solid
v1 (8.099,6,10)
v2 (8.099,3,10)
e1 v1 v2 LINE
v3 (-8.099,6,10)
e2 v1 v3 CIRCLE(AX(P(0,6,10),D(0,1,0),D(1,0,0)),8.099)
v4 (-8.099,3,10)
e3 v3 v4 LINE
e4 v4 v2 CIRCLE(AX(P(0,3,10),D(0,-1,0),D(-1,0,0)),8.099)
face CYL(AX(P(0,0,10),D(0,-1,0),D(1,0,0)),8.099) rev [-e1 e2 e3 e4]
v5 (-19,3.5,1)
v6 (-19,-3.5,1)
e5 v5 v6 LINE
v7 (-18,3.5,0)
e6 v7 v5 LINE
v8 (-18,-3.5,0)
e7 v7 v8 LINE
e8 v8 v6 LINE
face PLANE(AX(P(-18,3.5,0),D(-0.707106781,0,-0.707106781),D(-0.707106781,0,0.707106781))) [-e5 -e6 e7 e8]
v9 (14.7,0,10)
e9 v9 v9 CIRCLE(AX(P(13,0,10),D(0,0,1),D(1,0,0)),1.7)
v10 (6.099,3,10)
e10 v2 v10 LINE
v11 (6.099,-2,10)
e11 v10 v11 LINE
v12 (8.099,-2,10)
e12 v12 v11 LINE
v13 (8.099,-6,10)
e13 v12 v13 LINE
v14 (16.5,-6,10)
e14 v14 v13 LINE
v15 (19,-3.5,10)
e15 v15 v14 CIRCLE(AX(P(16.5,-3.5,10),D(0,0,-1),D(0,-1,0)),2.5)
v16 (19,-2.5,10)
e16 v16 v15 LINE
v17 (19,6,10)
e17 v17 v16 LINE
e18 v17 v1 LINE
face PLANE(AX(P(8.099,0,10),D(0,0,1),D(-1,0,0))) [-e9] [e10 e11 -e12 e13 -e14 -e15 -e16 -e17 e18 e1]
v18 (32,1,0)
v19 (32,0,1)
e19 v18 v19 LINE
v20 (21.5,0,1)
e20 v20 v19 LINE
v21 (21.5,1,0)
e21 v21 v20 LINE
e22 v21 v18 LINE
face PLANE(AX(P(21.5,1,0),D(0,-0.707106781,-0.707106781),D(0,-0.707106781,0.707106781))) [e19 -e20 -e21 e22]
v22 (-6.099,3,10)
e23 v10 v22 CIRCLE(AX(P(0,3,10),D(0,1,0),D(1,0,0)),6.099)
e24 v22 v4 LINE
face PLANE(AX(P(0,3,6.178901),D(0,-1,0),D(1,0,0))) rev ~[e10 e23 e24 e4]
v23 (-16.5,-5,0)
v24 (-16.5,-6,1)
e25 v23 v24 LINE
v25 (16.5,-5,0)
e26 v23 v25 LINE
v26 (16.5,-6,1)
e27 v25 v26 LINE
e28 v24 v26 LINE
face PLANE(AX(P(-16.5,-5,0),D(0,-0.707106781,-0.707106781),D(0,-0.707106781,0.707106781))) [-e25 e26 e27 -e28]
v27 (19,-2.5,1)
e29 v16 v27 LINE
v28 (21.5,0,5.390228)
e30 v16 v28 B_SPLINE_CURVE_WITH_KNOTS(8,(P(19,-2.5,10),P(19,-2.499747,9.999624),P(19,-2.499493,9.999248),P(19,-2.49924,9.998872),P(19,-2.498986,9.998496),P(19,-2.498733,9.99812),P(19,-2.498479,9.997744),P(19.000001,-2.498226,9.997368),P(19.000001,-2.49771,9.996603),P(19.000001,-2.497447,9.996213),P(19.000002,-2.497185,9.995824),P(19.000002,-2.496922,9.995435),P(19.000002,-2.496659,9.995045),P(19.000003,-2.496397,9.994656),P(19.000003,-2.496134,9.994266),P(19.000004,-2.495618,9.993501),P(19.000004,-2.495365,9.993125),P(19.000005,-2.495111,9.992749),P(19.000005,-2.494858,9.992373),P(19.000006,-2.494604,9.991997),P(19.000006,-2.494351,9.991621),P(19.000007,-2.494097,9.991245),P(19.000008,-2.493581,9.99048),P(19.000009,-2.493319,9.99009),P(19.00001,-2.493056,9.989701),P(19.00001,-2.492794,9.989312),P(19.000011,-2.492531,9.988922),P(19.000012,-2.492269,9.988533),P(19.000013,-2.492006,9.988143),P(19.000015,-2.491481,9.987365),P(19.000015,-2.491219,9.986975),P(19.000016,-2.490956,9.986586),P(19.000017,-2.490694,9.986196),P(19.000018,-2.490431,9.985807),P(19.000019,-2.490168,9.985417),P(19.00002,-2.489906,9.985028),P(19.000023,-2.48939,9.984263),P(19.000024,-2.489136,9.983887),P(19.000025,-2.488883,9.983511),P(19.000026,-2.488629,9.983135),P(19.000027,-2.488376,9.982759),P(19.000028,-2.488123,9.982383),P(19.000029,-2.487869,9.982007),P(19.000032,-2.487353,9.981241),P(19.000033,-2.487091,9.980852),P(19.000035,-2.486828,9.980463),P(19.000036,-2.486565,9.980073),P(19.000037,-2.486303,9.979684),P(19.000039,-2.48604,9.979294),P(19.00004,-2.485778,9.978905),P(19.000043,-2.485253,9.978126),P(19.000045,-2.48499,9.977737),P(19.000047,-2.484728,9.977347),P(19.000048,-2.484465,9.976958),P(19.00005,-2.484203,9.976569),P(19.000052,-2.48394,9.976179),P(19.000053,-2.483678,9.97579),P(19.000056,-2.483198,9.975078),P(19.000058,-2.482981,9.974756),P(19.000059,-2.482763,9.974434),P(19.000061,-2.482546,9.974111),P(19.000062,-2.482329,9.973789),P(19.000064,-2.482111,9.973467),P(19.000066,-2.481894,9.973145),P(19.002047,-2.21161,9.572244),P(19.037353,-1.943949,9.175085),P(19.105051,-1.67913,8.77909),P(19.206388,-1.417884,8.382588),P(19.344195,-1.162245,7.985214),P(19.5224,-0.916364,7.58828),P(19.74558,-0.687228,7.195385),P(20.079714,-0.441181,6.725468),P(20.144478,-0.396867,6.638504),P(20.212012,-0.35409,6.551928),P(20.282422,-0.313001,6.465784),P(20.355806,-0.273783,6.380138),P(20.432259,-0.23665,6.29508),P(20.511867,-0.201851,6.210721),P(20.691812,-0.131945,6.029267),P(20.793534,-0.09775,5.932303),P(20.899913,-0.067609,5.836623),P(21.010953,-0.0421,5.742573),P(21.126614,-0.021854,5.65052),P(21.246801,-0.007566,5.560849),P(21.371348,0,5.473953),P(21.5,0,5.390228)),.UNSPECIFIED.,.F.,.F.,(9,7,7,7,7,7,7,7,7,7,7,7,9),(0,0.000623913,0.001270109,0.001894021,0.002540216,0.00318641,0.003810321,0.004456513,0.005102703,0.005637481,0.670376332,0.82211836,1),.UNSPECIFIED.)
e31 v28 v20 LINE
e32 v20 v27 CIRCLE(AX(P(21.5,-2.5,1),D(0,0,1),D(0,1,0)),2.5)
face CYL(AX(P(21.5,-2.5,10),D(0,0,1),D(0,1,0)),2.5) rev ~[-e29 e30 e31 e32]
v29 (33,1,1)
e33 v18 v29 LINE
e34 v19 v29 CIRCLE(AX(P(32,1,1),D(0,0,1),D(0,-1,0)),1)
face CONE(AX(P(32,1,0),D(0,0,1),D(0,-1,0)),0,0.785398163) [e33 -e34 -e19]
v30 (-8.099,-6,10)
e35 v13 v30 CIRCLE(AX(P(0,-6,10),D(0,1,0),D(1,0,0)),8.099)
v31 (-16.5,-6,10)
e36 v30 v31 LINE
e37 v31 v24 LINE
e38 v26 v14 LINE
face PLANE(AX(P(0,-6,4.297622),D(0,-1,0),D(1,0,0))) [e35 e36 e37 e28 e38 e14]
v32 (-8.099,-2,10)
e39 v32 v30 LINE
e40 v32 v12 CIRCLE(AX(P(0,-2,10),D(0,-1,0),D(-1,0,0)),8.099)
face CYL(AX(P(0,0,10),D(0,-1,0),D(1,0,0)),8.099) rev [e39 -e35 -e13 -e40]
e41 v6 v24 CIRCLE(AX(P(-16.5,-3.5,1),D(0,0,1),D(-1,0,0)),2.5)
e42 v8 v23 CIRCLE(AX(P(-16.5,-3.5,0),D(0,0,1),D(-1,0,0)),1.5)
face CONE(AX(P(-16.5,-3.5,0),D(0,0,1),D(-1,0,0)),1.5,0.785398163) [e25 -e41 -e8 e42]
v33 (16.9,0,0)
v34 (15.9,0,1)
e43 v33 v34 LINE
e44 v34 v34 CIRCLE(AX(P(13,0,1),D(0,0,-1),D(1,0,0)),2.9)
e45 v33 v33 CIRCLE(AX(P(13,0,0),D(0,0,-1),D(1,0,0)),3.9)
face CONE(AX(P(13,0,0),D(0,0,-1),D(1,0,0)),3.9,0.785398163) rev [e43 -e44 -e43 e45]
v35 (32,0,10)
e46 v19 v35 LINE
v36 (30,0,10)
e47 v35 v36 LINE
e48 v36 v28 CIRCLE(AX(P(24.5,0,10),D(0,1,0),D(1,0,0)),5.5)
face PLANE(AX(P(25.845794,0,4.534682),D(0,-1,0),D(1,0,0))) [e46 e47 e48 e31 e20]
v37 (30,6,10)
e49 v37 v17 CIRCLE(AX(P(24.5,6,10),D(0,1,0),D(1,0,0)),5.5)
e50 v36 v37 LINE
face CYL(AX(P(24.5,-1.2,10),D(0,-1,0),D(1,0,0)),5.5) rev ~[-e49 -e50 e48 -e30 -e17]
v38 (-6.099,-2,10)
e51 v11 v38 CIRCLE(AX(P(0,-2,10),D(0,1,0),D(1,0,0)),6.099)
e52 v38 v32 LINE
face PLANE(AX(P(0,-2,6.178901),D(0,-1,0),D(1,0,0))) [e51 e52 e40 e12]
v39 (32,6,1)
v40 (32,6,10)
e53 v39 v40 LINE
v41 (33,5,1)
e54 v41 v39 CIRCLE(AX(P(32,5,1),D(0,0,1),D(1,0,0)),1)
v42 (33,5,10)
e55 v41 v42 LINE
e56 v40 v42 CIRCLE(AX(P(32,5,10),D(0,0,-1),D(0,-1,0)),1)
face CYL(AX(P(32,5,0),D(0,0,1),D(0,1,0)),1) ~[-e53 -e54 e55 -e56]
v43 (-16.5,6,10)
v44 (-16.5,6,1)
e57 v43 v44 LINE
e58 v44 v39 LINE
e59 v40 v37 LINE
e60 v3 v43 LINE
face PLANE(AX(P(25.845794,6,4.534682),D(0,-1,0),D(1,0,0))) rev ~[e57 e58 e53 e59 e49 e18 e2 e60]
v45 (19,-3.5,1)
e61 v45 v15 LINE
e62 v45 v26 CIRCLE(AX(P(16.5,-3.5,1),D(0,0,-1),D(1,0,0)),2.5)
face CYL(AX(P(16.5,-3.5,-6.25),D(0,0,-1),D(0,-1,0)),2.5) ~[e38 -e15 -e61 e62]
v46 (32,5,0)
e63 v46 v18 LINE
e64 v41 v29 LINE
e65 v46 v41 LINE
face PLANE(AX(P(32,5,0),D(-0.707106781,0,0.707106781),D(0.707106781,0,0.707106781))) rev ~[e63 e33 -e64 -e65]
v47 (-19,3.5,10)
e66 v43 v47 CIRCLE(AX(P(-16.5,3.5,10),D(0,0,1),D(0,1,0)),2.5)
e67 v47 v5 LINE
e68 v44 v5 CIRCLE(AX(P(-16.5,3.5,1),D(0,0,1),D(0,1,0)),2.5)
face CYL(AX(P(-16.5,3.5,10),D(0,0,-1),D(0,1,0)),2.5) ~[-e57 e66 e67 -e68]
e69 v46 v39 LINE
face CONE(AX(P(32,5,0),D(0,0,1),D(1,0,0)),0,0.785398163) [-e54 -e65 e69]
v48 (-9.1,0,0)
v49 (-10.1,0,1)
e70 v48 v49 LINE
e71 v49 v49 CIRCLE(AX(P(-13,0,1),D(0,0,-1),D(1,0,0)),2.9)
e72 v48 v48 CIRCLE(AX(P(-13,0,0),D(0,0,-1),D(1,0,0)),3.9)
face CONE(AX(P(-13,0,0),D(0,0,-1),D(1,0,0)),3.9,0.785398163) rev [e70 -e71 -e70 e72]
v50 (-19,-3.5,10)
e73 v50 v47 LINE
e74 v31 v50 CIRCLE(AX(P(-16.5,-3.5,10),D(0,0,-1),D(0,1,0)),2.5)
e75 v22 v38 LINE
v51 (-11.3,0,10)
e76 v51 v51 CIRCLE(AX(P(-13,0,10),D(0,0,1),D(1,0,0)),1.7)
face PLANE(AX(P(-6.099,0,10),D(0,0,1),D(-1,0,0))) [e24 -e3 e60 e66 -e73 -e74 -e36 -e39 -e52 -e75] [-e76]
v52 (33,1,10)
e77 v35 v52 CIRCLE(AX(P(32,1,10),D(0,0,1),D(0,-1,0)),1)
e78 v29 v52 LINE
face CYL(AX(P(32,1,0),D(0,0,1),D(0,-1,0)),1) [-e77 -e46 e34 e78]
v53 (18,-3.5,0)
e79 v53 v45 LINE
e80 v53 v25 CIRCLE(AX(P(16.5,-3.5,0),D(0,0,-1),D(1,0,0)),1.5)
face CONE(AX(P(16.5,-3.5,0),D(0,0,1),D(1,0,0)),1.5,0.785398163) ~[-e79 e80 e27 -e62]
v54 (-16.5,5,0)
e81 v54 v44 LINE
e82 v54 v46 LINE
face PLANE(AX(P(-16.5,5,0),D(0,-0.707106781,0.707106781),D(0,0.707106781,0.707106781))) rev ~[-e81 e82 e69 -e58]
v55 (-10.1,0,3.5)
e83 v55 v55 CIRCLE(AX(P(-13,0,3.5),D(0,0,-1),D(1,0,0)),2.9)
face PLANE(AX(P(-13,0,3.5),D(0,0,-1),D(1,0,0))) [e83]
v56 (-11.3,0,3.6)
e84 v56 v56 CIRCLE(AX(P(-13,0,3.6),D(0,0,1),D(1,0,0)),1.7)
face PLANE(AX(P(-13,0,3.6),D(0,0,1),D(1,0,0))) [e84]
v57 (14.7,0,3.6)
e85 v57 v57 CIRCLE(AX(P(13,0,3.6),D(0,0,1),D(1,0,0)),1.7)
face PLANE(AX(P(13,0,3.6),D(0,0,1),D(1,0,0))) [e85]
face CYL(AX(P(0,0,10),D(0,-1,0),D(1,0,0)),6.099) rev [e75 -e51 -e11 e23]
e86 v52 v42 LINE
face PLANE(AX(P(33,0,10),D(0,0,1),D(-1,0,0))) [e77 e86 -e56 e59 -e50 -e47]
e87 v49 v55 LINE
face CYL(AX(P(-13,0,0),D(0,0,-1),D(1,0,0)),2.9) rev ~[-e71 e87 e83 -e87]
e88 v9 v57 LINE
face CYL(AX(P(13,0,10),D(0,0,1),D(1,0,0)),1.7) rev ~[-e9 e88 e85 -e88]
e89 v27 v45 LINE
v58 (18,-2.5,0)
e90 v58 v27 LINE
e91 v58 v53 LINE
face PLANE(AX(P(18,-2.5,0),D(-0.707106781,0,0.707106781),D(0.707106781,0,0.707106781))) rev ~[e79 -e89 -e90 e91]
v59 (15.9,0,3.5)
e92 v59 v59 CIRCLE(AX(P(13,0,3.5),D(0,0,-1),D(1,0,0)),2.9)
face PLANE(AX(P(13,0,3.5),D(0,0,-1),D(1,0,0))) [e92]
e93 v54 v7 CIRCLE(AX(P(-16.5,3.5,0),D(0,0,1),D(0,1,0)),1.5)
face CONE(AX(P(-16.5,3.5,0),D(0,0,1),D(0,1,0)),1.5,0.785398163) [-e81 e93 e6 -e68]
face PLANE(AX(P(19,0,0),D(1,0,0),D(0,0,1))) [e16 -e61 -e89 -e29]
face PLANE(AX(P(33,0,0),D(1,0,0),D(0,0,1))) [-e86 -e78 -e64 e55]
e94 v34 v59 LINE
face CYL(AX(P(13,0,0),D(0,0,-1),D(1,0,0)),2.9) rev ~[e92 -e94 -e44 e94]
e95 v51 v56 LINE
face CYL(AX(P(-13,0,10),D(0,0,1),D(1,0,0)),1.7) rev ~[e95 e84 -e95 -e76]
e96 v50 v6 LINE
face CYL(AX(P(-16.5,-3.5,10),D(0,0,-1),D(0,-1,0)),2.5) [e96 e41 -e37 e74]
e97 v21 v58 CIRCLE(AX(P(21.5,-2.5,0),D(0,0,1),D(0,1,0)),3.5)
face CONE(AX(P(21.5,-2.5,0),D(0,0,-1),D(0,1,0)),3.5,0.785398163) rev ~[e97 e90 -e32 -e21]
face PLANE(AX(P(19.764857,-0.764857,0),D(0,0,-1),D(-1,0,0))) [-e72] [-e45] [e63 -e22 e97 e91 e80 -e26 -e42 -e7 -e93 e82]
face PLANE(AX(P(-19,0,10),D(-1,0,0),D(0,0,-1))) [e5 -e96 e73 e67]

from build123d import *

# Parameters (mm, degrees)
F1_DEPTH      = 6
F2_DEPTH      = 2
F2_DEPTH_BACK = 3
F3_DEPTH      = 6
F4_R          = 2.9
F4_R_2        = 1.7
F5_DEPTH      = 3.5
F6_R          = 2.5
F7_T4_DEPTH   = 10
F7_S5_R       = 5.5
F7_T6_DEPTH   = 7
F7_T7_DEPTH   = 22.5
F8_R          = 1
F9_T1_DEPTH   = 48.4999999995
F9_T3_DEPTH   = 10.5
F9_T5_DEPTH   = 4
F9_T7_DEPTH   = 1
F9_T9_DEPTH   = 32.9999999994
F9_T11_DEPTH  = 7
F9_T18_ANGLE  = 90
F9_T20_ANGLE  = 89.9999999974
F9_T22_ANGLE  = 90
F9_T24_ANGLE  = 90.0000000053
F9_T26_ANGLE  = 90
F9_T28_ANGLE  = 90
F10_R         = 1.7
F11_DEPTH     = 6.4


# Not quite as in the source:
# - a fillet or chamfer that OpenCascade refuses, or shapes differently, is made with other operations: its cross-section is extruded or revolved along the edge and cut away or added


with BuildPart() as f1:
    # F0 (on Front) → F1 (new body, symmetric)
    with BuildSketch(Plane.XZ):
        with BuildLine():
            Line((18.9999999997, 0), (18.9999999997, 10))
            Line((18.9999999997, 10), (8.099, 10))
            ThreePointArc((8.099, 10), (0, 1.901), (-8.099, 10))
            Line((-8.099, 10), (-18.9999999997, 10))
            Line((-18.9999999997, 10), (-18.9999999997, 0))
            Line((-18.9999999997, 0), (18.9999999997, 0))
        make_face()
    extrude(amount=F1_DEPTH, both=True)

    # F0 (on Front) → F2 (join, two sides)
    with BuildSketch(Plane.XZ) as f2_sk:
        with BuildLine():
            ThreePointArc((-8.099, 10), (0, 1.901), (8.099, 10))
            Line((8.099, 10), (6.099, 10))
            ThreePointArc((6.099, 10), (0, 3.901), (-6.099, 10))
            Line((-6.099, 10), (-8.099, 10))
        make_face()
    extrude(amount=F2_DEPTH)
    extrude(f2_sk.sketch, amount=-F2_DEPTH_BACK)

    # F0 (on Front) → F3 (join)
    with BuildSketch(Plane.XZ):
        with BuildLine():
            ThreePointArc((29.9999999997, 10), (24.4999999997, 4.5), (18.9999999997, 10))
            Line((18.9999999997, 10), (18.9999999997, 0))
            Line((18.9999999997, 0), (32.9999999997, 0))
            Line((32.9999999997, 0), (32.9999999997, 10))
            Line((32.9999999997, 10), (29.9999999997, 10))
        make_face()
    extrude(amount=-F3_DEPTH)

    # F4 (on face) → F5 (cut)
    with BuildSketch(Plane(origin=(0, 0, 0), x_dir=(1, 0, 0), z_dir=(0, 0, -1))):
        with Locations((13, 0)):
            Circle(F4_R)
        with Locations((13, 0)):
            Circle(F4_R_2, mode=Mode.SUBTRACT)
        with Locations((-13, 0)):
            Circle(F4_R)
        with Locations((-13, 0)):
            Circle(F4_R_2, mode=Mode.SUBTRACT)
        with Locations((13, 0)):
            Circle(F4_R_2)
        with Locations((-13, 0)):
            Circle(F4_R_2)
    extrude(amount=-F5_DEPTH, mode=Mode.SUBTRACT)

    # F6
    f6_edges = [f1.edges().sort_by_distance(p)[0] for p in [
        (-19, 6, 5),
        (-19, -6, 5),
    ]]
    fillet(f6_edges, radius=F6_R)

    # F7: fillet of radius 2.5 on 2 edges, made by hand


with BuildPart() as f7_tool2:
    # F7_s3 → F7_t4 (new body)
    with BuildSketch(Plane.XY.offset(10)):
        with BuildLine():
            ThreePointArc((21.4999999997, 0), (19.7322330468, -0.732233047), (18.9999999997, -2.5))
            Line((18.9999999997, -2.5), (18.9999999997, 0))
            Line((18.9999999997, 0), (21.4999999997, 0))
        make_face()
    extrude(amount=-F7_T4_DEPTH)

    # F7_s5 → F7_t6 (cut, symmetric)
    with BuildSketch(Plane.XZ.offset(1.2)):
        with Locations((24.4999999997, 10)):
            Circle(F7_S5_R)
    extrude(amount=F7_T6_DEPTH, both=True, mode=Mode.SUBTRACT)


with BuildPart() as f1_1:
    add(f1.part)

    # F7_t1: union F7_tool2
    add(f7_tool2.part)

    # F7_s8 → F7_t7 (cut)
    with BuildSketch(Plane.XY.offset(-6.25)):
        with BuildLine():
            ThreePointArc((16.4999999997, -6), (18.2677669527, -5.267766953), (18.9999999997, -3.5))
            Line((18.9999999997, -3.5), (18.9999999997, -6))
            Line((18.9999999997, -6), (16.4999999997, -6))
        make_face()
    extrude(amount=F7_T7_DEPTH, mode=Mode.SUBTRACT)

    # F8
    f8_edges = [f1_1.edges().sort_by_distance(p)[0] for p in [
        (33, 6, 5),
        (33, 0, 5),
    ]]
    fillet(f8_edges, radius=F8_R)

    # F9: chamfer of 1 on 14 edges, made by hand

    # F9_s2 → F9_t1 (cut)
    with BuildSketch(Plane.YZ.offset(-16.4999999997)):
        Polygon((5, 0), (6, 1), (6, 0), align=None)
    extrude(amount=F9_T1_DEPTH, mode=Mode.SUBTRACT)

    # F9_s4 → F9_t3 (cut)
    with BuildSketch(Plane.YZ.offset(21.4999999997)):
        Polygon((1, 0), (0, 1), (0, 0), align=None)
    extrude(amount=F9_T3_DEPTH, mode=Mode.SUBTRACT)

    # F9_s6 → F9_t5 (cut)
    with BuildSketch(Plane.XZ.offset(-5)):
        Polygon((31.9999999997, 0), (32.9999999997, 1), (32.9999999997, 0), align=None)
    extrude(amount=F9_T5_DEPTH, mode=Mode.SUBTRACT)

    # F9_s8 → F9_t7 (cut)
    with BuildSketch(Plane.XZ.offset(2.5)):
        Polygon((17.9999999997, 0), (18.9999999997, 1), (18.9999999997, 0), align=None)
    extrude(amount=F9_T7_DEPTH, mode=Mode.SUBTRACT)

    # F9_s10 → F9_t9 (cut)
    with BuildSketch(Plane.YZ.offset(-16.4999999997)):
        Polygon((-5, 0), (-6, 1), (-6, 0), align=None)
    extrude(amount=F9_T9_DEPTH, mode=Mode.SUBTRACT)

    # F9_s12 → F9_t11 (cut)
    with BuildSketch(Plane.XZ.offset(-3.5)):
        Polygon((-17.9999999997, 0), (-18.9999999997, 1), (-18.9999999997, 0), align=None)
    extrude(amount=F9_T11_DEPTH, mode=Mode.SUBTRACT)

    # F9_s13 → F9_t14 (revolve, cut)
    with BuildSketch(Plane.XZ):
        Polygon((-9.1, 0), (-10.1, 1), (-10.1, 0), align=None)
    revolve(axis=Axis((-13, 0, 0), (0, 0, -1)), mode=Mode.SUBTRACT)

    # F9_s15 → F9_t16 (revolve, cut)
    with BuildSketch(Plane.XZ):
        Polygon((16.9, 0), (15.9, 1), (15.9, 0), align=None)
    revolve(axis=Axis((13, 0, 0), (0, 0, -1)), mode=Mode.SUBTRACT)

    # F9_s17 → F9_t18 (revolve, cut)
    with BuildSketch(Plane.YZ.offset(31.9999999997)):
        Polygon((1, 0), (0, 1), (0, 0), align=None)
    revolve(axis=Axis((31.9999999997, 1, 0), (0, 0, 1)), revolution_arc=F9_T18_ANGLE, mode=Mode.SUBTRACT)

    # F9_s19 → F9_t20 (revolve, cut)
    with BuildSketch(Plane.YZ.offset(21.4999999998)):
        Polygon((1, 0), (0, 1), (0, 0), align=None)
    revolve(axis=Axis((21.4999999998, -2.5000000001, 0), (0, 0, 1)), revolution_arc=F9_T20_ANGLE, mode=Mode.SUBTRACT)

    # F9_s21 → F9_t22 (revolve, cut)
    with BuildSketch(Plane.XZ.offset(-5)):
        Polygon((31.9999999997, 0), (32.9999999997, 1), (32.9999999997, 0), align=None)
    revolve(axis=Axis((31.9999999997, 5, 0), (0, 0, 1)), revolution_arc=F9_T22_ANGLE, mode=Mode.SUBTRACT)

    # F9_s23 → F9_t24 (revolve, cut)
    with BuildSketch(Plane.XZ.offset(3.5000000001)):
        Polygon((17.9999999997, 0), (18.9999999997, 1), (18.9999999997, 0), align=None)
    revolve(axis=Axis((16.4999999998, -3.5000000001, 0), (0, 0, -1)), revolution_arc=F9_T24_ANGLE, mode=Mode.SUBTRACT)

    # F9_s25 → F9_t26 (revolve, cut)
    with BuildSketch(Plane.YZ.offset(-16.4999999997)):
        Polygon((5, 0), (6, 1), (6, 0), align=None)
    revolve(axis=Axis((-16.4999999997, 3.5, 0), (0, 0, 1)), revolution_arc=F9_T26_ANGLE, mode=Mode.SUBTRACT)

    # F9_s27 → F9_t28 (revolve, cut)
    with BuildSketch(Plane.XZ.offset(3.5)):
        Polygon((-17.9999999997, 0), (-18.9999999997, 1), (-18.9999999997, 0), align=None)
    revolve(axis=Axis((-16.4999999997, -3.5, 0), (0, 0, 1)), revolution_arc=F9_T28_ANGLE, mode=Mode.SUBTRACT)

    # F10 (on face) → F11 (cut)
    with BuildSketch(Plane.XY.offset(10)):
        with Locations((-13, 0)):
            Circle(F10_R)
        with Locations((13, 0)):
            Circle(F10_R)
    extrude(amount=-F11_DEPTH, mode=Mode.SUBTRACT)


solid = f1_1.part
